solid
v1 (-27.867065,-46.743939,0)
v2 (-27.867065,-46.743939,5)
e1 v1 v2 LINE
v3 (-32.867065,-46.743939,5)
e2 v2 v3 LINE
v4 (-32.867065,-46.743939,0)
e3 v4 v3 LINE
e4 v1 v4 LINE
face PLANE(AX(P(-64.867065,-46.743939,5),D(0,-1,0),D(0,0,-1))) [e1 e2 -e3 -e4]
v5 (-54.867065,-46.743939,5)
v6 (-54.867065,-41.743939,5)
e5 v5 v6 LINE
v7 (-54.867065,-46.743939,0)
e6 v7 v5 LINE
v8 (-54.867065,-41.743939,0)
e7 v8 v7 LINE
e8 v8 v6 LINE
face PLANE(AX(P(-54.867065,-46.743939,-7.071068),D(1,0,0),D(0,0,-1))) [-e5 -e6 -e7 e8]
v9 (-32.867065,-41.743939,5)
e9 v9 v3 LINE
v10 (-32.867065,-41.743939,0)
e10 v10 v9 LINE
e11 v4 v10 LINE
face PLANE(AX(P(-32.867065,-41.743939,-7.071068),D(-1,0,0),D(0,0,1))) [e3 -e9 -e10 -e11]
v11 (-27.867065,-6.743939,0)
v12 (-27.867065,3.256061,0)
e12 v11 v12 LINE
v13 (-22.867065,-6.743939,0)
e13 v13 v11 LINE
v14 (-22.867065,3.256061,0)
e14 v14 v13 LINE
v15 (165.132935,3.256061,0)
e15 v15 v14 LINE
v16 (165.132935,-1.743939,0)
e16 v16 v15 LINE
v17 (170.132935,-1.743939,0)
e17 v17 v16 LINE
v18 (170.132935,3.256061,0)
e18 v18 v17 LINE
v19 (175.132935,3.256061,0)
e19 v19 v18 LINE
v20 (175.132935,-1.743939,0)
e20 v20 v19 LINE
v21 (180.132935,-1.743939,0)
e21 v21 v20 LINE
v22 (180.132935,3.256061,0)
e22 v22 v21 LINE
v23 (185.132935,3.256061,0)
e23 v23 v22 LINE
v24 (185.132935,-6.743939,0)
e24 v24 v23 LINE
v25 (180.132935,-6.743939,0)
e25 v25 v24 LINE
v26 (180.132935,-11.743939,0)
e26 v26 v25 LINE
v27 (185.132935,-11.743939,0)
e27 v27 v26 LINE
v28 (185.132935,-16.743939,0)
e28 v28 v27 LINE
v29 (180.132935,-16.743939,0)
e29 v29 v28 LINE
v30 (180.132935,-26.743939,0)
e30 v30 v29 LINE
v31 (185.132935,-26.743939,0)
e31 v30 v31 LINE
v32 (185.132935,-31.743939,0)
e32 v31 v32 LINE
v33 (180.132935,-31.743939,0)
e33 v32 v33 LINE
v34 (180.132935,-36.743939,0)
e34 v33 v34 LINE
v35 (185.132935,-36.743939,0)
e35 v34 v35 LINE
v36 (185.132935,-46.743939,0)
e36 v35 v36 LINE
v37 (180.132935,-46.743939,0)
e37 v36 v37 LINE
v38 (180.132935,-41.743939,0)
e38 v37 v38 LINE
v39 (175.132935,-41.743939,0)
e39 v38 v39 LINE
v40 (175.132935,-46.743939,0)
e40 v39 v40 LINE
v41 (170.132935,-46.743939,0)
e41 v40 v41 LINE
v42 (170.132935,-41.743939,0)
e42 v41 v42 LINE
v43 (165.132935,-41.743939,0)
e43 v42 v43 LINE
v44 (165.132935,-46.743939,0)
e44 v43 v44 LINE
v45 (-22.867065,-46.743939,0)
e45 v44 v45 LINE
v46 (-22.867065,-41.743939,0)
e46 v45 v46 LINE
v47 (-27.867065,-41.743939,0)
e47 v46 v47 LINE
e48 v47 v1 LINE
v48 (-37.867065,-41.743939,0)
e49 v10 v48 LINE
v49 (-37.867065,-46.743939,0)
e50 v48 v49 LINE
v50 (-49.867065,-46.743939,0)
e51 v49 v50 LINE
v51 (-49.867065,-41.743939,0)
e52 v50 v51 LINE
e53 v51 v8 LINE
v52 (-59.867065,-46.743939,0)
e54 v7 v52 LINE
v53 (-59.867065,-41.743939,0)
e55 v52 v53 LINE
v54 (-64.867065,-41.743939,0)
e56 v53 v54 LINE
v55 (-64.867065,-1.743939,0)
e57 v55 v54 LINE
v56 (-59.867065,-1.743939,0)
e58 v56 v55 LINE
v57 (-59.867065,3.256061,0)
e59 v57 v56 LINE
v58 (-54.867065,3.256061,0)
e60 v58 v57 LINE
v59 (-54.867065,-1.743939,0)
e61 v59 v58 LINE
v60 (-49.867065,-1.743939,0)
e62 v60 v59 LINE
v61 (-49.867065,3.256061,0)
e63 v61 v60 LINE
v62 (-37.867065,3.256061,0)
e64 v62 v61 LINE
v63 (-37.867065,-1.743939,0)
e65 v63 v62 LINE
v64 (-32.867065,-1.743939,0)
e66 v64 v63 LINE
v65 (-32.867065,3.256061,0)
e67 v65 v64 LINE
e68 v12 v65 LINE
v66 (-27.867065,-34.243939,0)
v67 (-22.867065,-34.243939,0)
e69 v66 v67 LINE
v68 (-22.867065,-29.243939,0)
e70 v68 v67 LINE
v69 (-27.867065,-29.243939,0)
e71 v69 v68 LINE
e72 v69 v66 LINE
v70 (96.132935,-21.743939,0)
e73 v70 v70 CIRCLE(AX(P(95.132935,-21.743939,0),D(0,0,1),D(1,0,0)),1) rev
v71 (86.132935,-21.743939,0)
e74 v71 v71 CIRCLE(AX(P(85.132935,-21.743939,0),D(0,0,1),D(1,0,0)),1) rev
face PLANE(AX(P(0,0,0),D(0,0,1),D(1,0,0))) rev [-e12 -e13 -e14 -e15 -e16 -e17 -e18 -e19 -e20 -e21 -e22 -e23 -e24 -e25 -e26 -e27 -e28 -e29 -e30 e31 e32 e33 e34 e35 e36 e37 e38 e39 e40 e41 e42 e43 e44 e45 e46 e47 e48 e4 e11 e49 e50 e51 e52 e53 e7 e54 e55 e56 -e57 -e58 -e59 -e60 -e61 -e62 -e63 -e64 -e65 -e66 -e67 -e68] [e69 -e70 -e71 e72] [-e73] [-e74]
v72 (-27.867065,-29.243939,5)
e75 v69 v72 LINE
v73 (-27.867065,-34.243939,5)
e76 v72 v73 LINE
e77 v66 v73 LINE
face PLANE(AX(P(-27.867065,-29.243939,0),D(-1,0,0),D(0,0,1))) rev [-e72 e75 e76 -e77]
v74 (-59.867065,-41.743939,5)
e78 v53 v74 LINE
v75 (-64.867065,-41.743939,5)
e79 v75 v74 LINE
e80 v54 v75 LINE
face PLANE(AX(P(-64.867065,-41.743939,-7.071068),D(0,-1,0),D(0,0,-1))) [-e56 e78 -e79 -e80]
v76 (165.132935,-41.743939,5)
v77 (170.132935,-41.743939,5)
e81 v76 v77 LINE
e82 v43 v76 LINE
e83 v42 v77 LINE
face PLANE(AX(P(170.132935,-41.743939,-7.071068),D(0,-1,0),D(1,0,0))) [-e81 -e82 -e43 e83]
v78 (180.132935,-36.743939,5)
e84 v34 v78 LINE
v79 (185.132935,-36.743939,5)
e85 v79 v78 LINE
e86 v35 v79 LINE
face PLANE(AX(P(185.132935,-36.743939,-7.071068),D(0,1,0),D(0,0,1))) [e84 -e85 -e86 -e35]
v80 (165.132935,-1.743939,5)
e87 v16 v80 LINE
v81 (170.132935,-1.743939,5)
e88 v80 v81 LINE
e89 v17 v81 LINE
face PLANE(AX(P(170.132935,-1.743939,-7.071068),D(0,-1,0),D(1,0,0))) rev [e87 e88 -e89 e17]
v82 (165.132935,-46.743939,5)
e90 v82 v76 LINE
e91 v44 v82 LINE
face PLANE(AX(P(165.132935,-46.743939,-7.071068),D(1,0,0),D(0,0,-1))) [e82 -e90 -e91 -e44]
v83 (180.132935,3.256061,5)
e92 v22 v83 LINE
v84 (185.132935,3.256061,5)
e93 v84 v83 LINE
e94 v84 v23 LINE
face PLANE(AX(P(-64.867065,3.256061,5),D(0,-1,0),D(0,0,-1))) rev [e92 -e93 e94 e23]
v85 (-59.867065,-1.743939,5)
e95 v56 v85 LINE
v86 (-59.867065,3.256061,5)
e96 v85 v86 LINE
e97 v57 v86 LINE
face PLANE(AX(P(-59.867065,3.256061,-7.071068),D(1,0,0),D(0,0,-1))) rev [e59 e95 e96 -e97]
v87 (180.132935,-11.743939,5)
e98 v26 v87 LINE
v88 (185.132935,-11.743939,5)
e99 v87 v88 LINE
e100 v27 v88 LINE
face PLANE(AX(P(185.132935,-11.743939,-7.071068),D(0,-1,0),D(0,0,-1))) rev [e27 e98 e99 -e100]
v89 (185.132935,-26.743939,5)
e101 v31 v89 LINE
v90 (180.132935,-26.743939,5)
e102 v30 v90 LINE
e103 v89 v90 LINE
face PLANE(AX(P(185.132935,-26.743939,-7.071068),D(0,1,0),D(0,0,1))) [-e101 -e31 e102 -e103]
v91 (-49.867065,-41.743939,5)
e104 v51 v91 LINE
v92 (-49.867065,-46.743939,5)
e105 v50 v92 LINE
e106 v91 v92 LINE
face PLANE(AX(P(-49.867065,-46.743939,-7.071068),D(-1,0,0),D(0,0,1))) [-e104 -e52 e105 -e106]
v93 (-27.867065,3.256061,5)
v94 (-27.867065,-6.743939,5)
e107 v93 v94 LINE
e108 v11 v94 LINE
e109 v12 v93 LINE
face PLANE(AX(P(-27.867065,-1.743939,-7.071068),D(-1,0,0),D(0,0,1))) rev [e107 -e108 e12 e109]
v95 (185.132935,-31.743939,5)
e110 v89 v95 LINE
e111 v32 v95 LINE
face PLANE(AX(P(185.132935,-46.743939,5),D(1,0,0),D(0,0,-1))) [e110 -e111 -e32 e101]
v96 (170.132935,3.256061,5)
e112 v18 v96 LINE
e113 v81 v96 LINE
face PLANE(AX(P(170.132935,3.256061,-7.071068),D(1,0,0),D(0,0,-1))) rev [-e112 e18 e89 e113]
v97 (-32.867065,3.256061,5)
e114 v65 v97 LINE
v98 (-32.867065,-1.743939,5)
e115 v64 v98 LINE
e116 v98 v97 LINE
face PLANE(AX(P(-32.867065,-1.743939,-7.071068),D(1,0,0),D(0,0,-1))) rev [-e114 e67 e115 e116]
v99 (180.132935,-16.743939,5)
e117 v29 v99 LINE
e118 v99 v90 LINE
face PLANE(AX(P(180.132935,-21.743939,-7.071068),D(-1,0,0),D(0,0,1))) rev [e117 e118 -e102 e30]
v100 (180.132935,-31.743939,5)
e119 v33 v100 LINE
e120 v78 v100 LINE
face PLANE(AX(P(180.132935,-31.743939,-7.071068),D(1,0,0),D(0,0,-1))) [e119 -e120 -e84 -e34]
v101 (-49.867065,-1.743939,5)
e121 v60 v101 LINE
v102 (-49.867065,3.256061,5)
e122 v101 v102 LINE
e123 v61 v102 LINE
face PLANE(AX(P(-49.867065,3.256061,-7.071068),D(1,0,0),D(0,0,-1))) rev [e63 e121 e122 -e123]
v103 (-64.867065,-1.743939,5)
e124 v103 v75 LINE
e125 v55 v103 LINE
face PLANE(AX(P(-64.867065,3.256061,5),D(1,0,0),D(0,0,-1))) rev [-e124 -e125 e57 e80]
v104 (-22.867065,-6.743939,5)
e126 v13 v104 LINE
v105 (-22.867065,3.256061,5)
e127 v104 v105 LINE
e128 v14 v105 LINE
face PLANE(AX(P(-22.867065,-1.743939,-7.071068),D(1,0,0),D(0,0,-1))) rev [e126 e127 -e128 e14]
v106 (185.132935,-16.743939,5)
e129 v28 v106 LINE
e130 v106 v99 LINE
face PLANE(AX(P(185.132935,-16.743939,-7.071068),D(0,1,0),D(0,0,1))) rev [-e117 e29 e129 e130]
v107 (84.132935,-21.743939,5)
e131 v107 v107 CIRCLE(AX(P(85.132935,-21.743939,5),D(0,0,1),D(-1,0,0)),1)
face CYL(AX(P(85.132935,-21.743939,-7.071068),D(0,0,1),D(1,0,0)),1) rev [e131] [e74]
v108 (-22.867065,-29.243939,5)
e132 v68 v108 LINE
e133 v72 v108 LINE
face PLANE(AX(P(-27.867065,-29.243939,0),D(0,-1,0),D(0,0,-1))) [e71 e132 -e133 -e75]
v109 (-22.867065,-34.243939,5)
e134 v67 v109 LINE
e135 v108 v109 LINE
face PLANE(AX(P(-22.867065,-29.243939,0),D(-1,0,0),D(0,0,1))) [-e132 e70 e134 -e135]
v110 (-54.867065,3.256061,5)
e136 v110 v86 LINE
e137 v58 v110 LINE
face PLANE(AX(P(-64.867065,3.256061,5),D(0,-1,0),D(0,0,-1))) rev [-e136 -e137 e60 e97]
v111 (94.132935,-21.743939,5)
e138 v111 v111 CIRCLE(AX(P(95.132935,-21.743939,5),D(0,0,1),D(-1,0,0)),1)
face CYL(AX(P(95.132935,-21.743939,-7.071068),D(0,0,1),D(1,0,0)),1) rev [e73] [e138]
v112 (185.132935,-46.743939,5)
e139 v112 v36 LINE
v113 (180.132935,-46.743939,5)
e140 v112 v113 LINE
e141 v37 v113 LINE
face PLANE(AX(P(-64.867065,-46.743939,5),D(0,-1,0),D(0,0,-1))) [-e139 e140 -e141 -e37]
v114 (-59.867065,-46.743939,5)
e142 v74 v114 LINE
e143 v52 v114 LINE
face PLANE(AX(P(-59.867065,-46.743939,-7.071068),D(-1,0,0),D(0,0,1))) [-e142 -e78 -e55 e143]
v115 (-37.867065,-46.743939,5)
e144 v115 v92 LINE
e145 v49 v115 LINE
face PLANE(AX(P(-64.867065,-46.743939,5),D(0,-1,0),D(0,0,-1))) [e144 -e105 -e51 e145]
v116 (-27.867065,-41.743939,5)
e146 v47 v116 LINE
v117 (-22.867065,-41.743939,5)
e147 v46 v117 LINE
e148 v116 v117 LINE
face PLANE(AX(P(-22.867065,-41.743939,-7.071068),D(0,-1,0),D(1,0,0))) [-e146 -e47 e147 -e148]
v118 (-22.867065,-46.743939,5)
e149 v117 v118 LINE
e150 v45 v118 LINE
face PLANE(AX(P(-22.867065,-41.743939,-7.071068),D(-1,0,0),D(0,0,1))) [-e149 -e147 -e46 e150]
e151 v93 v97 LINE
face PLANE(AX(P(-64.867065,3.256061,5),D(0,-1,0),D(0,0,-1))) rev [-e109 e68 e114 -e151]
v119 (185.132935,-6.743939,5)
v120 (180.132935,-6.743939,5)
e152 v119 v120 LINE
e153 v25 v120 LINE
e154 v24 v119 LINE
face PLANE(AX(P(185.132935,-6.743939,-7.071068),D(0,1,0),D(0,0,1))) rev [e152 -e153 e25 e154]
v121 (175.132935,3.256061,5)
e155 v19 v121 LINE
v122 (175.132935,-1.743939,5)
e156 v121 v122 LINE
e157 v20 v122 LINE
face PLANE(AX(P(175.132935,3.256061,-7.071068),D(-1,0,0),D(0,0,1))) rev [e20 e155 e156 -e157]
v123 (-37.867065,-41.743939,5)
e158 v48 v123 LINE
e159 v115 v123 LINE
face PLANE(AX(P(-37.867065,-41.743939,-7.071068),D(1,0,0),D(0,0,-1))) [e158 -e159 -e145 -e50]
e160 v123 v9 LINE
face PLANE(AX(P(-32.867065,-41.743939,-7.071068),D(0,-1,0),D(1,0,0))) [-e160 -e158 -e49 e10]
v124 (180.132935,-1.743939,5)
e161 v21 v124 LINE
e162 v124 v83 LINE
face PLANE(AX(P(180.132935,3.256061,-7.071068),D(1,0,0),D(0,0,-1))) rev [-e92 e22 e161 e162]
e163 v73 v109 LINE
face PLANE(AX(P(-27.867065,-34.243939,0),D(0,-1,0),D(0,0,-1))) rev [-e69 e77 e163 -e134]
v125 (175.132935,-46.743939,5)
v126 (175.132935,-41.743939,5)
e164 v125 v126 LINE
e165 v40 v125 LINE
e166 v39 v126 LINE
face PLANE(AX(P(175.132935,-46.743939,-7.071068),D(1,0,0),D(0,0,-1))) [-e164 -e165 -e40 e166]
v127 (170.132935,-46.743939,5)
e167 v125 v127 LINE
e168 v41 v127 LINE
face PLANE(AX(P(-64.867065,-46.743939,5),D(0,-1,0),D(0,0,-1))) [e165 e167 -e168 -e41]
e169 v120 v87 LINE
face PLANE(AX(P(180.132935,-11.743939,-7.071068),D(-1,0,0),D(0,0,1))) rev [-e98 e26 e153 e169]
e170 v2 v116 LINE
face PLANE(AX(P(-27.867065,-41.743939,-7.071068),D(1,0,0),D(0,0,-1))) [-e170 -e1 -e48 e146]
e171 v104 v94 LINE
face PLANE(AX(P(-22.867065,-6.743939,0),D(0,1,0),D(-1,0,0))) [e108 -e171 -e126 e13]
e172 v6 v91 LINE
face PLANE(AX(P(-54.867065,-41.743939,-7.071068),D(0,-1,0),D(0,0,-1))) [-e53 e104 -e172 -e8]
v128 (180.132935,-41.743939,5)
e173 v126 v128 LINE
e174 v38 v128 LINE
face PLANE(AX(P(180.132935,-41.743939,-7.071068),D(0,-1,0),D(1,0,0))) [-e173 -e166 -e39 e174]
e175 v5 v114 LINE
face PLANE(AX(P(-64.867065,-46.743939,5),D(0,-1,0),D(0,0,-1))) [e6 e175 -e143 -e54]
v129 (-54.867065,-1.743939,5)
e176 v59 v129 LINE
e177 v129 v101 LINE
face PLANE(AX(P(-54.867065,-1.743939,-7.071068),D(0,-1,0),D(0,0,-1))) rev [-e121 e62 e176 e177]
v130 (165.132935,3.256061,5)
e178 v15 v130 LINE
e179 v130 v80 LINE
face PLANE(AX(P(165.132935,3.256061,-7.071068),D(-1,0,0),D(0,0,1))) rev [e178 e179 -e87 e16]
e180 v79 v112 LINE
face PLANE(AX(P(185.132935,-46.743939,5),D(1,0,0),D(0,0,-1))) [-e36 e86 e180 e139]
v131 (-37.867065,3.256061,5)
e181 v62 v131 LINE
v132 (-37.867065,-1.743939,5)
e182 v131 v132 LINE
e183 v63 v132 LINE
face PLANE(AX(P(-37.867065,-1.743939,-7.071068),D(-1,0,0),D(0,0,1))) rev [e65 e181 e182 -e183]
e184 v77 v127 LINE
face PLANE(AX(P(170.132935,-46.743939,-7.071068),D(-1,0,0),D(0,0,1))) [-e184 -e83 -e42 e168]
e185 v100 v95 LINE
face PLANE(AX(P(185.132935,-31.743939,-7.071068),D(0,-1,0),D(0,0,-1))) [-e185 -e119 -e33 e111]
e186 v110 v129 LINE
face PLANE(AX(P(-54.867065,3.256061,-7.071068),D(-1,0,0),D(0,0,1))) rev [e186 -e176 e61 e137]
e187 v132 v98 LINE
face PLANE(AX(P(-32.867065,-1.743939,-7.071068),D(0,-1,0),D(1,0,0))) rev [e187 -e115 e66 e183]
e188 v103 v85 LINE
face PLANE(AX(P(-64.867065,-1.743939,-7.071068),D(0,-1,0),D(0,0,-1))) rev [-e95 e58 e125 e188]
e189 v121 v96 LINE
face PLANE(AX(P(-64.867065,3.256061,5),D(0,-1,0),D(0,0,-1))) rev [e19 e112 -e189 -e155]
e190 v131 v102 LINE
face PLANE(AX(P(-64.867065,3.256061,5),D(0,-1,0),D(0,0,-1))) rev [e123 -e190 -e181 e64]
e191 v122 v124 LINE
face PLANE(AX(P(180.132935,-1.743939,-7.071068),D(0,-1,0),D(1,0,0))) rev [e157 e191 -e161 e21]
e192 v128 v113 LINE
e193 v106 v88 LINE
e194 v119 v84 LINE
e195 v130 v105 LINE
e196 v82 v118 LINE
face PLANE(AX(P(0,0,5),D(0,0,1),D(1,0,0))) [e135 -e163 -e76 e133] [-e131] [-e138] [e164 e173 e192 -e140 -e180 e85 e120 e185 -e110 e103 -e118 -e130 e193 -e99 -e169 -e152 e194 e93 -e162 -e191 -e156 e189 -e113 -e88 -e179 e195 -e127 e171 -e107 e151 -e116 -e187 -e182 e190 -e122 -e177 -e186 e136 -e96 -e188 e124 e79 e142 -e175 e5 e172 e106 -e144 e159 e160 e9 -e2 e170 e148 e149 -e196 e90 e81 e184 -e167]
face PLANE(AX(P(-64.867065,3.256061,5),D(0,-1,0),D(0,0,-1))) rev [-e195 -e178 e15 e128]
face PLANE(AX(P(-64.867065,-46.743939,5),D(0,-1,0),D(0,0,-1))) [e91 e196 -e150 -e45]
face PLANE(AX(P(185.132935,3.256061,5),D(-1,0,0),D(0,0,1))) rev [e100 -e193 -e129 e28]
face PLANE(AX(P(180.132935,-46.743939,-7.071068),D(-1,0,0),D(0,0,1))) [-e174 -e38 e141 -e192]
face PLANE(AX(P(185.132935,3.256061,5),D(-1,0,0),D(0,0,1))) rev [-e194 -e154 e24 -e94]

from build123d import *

# Parameters (mm, degrees)
ESQUISSE1_W              = 250
ESQUISSE1_H              = 25
BOSS_EXTRU_1_DEPTH       = 5
ESQUISSE2_W              = 5
ESQUISSE2_H              = 5
ENL_V_MAT_EXTRU_1_DEPTH  = 5
SYM_TRIE1_DEPTH          = 5
ESQUISSE3_W              = 5
ESQUISSE3_H              = 5
ENL_V_MAT_EXTRU_14_DEPTH = 5


# Read off the part's stored shape, not the designer's step: Symétrie1
with BuildPart() as part:
    # Esquisse1 → Boss.-Extru.1 (new body)
    with BuildSketch(Plane.XY):
        with Locations((60.132935366, -9.243939394)):
            Rectangle(ESQUISSE1_W, ESQUISSE1_H)
    extrude(amount=BOSS_EXTRU_1_DEPTH)

    # Esquisse2 → Enlèv. mat.-Extru.1 (cut)
    with BuildSketch(Plane.XY.offset(5)):
        with Locations((177.632935366, 0.756060606)):
            Rectangle(ESQUISSE2_W, ESQUISSE2_H)
        with Locations((167.632935366, 0.756060606)):
            Rectangle(ESQUISSE2_W, ESQUISSE2_H)
        with Locations((-25.367064634, 0.756060606)):
            Rectangle(ESQUISSE2_W, ESQUISSE2_H)
        with Locations((-35.367064634, 0.756060606)):
            Rectangle(ESQUISSE2_W, ESQUISSE2_H)
        with Locations((-52.367064634, 0.756060606)):
            Rectangle(ESQUISSE2_W, ESQUISSE2_H)
        with Locations((-62.367064634, 0.756060606)):
            Rectangle(ESQUISSE2_W, ESQUISSE2_H)
        with Locations((182.632935366, -9.243939394)):
            Rectangle(ESQUISSE2_W, ESQUISSE2_H)
        with Locations((182.632935366, -19.243939394)):
            Rectangle(ESQUISSE2_W, ESQUISSE2_H)
        with BuildLine():
            Line((84.132935366, -21.743939394), (85.132935366, -21.743939394))
            Line((85.132935366, -21.743939394), (86.132935366, -21.743939394))
            ThreePointArc((86.132935366, -21.743939394), (85.132935366, -20.743939394), (84.132935366, -21.743939394))
        make_face()
        with BuildLine():
            Line((94.132935366, -21.743939394), (95.132935366, -21.743939394))
            Line((95.132935366, -21.743939394), (96.132935366, -21.743939394))
            ThreePointArc((96.132935366, -21.743939394), (95.132935366, -20.743939394), (94.132935366, -21.743939394))
        make_face()
    extrude(amount=-ENL_V_MAT_EXTRU_1_DEPTH, mode=Mode.SUBTRACT)

    # Symétrie1 outline → Symétrie1 (add)
    with BuildSketch(Plane.XY):
        with BuildLine():
            Line((180.132935366, -31.743939394), (185.132935366, -31.743939394))
            Line((185.132935366, -31.743939394), (185.132935366, -26.743939394))
            Line((185.132935366, -26.743939394), (180.132935366, -26.743939394))
            Line((180.132935366, -26.743939394), (180.132935366, -21.743939394))
            Line((180.132935366, -21.743939394), (96.132935366, -21.743939394))
            ThreePointArc((96.132935366, -21.743939394), (95.132935366, -22.743939394), (94.132935366, -21.743939394))
            Line((94.132935366, -21.743939394), (86.132935366, -21.743939394))
            ThreePointArc((86.132935366, -21.743939394), (85.132935366, -22.743939394), (84.132935366, -21.743939394))
            Line((84.132935366, -21.743939394), (-64.867064634, -21.743939394))
            Line((-64.867064634, -21.743939394), (-64.867064634, -41.743939394))
            Line((-64.867064634, -41.743939394), (-59.867064634, -41.743939394))
            Line((-59.867064634, -41.743939394), (-59.867064634, -46.743939394))
            Line((-59.867064634, -46.743939394), (-54.867064634, -46.743939394))
            Line((-54.867064634, -46.743939394), (-54.867064634, -41.743939394))
            Line((-54.867064634, -41.743939394), (-49.867064634, -41.743939394))
            Line((-49.867064634, -41.743939394), (-49.867064634, -46.743939394))
            Line((-49.867064634, -46.743939394), (-37.867064634, -46.743939394))
            Line((-37.867064634, -46.743939394), (-37.867064634, -41.743939394))
            Line((-37.867064634, -41.743939394), (-32.867064634, -41.743939394))
            Line((-32.867064634, -41.743939394), (-32.867064634, -46.743939394))
            Line((-32.867064634, -46.743939394), (-27.867064634, -46.743939394))
            Line((-27.867064634, -46.743939394), (-27.867064634, -41.743939394))
            Line((-27.867064634, -41.743939394), (-22.867064634, -41.743939394))
            Line((-22.867064634, -41.743939394), (-22.867064634, -46.743939394))
            Line((-22.867064634, -46.743939394), (165.132935366, -46.743939394))
            Line((165.132935366, -46.743939394), (165.132935366, -41.743939394))
            Line((165.132935366, -41.743939394), (170.132935366, -41.743939394))
            Line((170.132935366, -41.743939394), (170.132935366, -46.743939394))
            Line((170.132935366, -46.743939394), (175.132935366, -46.743939394))
            Line((175.132935366, -46.743939394), (175.132935366, -41.743939394))
            Line((175.132935366, -41.743939394), (180.132935366, -41.743939394))
            Line((180.132935366, -41.743939394), (180.132935366, -46.743939394))
            Line((180.132935366, -46.743939394), (185.132935366, -46.743939394))
            Line((185.132935366, -46.743939394), (185.132935366, -36.743939394))
            Line((185.132935366, -36.743939394), (180.132935366, -36.743939394))
            Line((180.132935366, -36.743939394), (180.132935366, -31.743939394))
        make_face()
    extrude(amount=SYM_TRIE1_DEPTH)

    # Esquisse3 → Enlèv. mat.-Extru.14 (cut)
    with BuildSketch(Plane.XY.offset(5)):
        with Locations((-25.367064634, -4.243939394)):
            Rectangle(ESQUISSE3_W, ESQUISSE3_H)
        with Locations((-25.367064634, -31.743939394)):
            Rectangle(ESQUISSE3_W, ESQUISSE3_H)
    extrude(amount=-ENL_V_MAT_EXTRU_14_DEPTH, mode=Mode.SUBTRACT)


solid = part.part
